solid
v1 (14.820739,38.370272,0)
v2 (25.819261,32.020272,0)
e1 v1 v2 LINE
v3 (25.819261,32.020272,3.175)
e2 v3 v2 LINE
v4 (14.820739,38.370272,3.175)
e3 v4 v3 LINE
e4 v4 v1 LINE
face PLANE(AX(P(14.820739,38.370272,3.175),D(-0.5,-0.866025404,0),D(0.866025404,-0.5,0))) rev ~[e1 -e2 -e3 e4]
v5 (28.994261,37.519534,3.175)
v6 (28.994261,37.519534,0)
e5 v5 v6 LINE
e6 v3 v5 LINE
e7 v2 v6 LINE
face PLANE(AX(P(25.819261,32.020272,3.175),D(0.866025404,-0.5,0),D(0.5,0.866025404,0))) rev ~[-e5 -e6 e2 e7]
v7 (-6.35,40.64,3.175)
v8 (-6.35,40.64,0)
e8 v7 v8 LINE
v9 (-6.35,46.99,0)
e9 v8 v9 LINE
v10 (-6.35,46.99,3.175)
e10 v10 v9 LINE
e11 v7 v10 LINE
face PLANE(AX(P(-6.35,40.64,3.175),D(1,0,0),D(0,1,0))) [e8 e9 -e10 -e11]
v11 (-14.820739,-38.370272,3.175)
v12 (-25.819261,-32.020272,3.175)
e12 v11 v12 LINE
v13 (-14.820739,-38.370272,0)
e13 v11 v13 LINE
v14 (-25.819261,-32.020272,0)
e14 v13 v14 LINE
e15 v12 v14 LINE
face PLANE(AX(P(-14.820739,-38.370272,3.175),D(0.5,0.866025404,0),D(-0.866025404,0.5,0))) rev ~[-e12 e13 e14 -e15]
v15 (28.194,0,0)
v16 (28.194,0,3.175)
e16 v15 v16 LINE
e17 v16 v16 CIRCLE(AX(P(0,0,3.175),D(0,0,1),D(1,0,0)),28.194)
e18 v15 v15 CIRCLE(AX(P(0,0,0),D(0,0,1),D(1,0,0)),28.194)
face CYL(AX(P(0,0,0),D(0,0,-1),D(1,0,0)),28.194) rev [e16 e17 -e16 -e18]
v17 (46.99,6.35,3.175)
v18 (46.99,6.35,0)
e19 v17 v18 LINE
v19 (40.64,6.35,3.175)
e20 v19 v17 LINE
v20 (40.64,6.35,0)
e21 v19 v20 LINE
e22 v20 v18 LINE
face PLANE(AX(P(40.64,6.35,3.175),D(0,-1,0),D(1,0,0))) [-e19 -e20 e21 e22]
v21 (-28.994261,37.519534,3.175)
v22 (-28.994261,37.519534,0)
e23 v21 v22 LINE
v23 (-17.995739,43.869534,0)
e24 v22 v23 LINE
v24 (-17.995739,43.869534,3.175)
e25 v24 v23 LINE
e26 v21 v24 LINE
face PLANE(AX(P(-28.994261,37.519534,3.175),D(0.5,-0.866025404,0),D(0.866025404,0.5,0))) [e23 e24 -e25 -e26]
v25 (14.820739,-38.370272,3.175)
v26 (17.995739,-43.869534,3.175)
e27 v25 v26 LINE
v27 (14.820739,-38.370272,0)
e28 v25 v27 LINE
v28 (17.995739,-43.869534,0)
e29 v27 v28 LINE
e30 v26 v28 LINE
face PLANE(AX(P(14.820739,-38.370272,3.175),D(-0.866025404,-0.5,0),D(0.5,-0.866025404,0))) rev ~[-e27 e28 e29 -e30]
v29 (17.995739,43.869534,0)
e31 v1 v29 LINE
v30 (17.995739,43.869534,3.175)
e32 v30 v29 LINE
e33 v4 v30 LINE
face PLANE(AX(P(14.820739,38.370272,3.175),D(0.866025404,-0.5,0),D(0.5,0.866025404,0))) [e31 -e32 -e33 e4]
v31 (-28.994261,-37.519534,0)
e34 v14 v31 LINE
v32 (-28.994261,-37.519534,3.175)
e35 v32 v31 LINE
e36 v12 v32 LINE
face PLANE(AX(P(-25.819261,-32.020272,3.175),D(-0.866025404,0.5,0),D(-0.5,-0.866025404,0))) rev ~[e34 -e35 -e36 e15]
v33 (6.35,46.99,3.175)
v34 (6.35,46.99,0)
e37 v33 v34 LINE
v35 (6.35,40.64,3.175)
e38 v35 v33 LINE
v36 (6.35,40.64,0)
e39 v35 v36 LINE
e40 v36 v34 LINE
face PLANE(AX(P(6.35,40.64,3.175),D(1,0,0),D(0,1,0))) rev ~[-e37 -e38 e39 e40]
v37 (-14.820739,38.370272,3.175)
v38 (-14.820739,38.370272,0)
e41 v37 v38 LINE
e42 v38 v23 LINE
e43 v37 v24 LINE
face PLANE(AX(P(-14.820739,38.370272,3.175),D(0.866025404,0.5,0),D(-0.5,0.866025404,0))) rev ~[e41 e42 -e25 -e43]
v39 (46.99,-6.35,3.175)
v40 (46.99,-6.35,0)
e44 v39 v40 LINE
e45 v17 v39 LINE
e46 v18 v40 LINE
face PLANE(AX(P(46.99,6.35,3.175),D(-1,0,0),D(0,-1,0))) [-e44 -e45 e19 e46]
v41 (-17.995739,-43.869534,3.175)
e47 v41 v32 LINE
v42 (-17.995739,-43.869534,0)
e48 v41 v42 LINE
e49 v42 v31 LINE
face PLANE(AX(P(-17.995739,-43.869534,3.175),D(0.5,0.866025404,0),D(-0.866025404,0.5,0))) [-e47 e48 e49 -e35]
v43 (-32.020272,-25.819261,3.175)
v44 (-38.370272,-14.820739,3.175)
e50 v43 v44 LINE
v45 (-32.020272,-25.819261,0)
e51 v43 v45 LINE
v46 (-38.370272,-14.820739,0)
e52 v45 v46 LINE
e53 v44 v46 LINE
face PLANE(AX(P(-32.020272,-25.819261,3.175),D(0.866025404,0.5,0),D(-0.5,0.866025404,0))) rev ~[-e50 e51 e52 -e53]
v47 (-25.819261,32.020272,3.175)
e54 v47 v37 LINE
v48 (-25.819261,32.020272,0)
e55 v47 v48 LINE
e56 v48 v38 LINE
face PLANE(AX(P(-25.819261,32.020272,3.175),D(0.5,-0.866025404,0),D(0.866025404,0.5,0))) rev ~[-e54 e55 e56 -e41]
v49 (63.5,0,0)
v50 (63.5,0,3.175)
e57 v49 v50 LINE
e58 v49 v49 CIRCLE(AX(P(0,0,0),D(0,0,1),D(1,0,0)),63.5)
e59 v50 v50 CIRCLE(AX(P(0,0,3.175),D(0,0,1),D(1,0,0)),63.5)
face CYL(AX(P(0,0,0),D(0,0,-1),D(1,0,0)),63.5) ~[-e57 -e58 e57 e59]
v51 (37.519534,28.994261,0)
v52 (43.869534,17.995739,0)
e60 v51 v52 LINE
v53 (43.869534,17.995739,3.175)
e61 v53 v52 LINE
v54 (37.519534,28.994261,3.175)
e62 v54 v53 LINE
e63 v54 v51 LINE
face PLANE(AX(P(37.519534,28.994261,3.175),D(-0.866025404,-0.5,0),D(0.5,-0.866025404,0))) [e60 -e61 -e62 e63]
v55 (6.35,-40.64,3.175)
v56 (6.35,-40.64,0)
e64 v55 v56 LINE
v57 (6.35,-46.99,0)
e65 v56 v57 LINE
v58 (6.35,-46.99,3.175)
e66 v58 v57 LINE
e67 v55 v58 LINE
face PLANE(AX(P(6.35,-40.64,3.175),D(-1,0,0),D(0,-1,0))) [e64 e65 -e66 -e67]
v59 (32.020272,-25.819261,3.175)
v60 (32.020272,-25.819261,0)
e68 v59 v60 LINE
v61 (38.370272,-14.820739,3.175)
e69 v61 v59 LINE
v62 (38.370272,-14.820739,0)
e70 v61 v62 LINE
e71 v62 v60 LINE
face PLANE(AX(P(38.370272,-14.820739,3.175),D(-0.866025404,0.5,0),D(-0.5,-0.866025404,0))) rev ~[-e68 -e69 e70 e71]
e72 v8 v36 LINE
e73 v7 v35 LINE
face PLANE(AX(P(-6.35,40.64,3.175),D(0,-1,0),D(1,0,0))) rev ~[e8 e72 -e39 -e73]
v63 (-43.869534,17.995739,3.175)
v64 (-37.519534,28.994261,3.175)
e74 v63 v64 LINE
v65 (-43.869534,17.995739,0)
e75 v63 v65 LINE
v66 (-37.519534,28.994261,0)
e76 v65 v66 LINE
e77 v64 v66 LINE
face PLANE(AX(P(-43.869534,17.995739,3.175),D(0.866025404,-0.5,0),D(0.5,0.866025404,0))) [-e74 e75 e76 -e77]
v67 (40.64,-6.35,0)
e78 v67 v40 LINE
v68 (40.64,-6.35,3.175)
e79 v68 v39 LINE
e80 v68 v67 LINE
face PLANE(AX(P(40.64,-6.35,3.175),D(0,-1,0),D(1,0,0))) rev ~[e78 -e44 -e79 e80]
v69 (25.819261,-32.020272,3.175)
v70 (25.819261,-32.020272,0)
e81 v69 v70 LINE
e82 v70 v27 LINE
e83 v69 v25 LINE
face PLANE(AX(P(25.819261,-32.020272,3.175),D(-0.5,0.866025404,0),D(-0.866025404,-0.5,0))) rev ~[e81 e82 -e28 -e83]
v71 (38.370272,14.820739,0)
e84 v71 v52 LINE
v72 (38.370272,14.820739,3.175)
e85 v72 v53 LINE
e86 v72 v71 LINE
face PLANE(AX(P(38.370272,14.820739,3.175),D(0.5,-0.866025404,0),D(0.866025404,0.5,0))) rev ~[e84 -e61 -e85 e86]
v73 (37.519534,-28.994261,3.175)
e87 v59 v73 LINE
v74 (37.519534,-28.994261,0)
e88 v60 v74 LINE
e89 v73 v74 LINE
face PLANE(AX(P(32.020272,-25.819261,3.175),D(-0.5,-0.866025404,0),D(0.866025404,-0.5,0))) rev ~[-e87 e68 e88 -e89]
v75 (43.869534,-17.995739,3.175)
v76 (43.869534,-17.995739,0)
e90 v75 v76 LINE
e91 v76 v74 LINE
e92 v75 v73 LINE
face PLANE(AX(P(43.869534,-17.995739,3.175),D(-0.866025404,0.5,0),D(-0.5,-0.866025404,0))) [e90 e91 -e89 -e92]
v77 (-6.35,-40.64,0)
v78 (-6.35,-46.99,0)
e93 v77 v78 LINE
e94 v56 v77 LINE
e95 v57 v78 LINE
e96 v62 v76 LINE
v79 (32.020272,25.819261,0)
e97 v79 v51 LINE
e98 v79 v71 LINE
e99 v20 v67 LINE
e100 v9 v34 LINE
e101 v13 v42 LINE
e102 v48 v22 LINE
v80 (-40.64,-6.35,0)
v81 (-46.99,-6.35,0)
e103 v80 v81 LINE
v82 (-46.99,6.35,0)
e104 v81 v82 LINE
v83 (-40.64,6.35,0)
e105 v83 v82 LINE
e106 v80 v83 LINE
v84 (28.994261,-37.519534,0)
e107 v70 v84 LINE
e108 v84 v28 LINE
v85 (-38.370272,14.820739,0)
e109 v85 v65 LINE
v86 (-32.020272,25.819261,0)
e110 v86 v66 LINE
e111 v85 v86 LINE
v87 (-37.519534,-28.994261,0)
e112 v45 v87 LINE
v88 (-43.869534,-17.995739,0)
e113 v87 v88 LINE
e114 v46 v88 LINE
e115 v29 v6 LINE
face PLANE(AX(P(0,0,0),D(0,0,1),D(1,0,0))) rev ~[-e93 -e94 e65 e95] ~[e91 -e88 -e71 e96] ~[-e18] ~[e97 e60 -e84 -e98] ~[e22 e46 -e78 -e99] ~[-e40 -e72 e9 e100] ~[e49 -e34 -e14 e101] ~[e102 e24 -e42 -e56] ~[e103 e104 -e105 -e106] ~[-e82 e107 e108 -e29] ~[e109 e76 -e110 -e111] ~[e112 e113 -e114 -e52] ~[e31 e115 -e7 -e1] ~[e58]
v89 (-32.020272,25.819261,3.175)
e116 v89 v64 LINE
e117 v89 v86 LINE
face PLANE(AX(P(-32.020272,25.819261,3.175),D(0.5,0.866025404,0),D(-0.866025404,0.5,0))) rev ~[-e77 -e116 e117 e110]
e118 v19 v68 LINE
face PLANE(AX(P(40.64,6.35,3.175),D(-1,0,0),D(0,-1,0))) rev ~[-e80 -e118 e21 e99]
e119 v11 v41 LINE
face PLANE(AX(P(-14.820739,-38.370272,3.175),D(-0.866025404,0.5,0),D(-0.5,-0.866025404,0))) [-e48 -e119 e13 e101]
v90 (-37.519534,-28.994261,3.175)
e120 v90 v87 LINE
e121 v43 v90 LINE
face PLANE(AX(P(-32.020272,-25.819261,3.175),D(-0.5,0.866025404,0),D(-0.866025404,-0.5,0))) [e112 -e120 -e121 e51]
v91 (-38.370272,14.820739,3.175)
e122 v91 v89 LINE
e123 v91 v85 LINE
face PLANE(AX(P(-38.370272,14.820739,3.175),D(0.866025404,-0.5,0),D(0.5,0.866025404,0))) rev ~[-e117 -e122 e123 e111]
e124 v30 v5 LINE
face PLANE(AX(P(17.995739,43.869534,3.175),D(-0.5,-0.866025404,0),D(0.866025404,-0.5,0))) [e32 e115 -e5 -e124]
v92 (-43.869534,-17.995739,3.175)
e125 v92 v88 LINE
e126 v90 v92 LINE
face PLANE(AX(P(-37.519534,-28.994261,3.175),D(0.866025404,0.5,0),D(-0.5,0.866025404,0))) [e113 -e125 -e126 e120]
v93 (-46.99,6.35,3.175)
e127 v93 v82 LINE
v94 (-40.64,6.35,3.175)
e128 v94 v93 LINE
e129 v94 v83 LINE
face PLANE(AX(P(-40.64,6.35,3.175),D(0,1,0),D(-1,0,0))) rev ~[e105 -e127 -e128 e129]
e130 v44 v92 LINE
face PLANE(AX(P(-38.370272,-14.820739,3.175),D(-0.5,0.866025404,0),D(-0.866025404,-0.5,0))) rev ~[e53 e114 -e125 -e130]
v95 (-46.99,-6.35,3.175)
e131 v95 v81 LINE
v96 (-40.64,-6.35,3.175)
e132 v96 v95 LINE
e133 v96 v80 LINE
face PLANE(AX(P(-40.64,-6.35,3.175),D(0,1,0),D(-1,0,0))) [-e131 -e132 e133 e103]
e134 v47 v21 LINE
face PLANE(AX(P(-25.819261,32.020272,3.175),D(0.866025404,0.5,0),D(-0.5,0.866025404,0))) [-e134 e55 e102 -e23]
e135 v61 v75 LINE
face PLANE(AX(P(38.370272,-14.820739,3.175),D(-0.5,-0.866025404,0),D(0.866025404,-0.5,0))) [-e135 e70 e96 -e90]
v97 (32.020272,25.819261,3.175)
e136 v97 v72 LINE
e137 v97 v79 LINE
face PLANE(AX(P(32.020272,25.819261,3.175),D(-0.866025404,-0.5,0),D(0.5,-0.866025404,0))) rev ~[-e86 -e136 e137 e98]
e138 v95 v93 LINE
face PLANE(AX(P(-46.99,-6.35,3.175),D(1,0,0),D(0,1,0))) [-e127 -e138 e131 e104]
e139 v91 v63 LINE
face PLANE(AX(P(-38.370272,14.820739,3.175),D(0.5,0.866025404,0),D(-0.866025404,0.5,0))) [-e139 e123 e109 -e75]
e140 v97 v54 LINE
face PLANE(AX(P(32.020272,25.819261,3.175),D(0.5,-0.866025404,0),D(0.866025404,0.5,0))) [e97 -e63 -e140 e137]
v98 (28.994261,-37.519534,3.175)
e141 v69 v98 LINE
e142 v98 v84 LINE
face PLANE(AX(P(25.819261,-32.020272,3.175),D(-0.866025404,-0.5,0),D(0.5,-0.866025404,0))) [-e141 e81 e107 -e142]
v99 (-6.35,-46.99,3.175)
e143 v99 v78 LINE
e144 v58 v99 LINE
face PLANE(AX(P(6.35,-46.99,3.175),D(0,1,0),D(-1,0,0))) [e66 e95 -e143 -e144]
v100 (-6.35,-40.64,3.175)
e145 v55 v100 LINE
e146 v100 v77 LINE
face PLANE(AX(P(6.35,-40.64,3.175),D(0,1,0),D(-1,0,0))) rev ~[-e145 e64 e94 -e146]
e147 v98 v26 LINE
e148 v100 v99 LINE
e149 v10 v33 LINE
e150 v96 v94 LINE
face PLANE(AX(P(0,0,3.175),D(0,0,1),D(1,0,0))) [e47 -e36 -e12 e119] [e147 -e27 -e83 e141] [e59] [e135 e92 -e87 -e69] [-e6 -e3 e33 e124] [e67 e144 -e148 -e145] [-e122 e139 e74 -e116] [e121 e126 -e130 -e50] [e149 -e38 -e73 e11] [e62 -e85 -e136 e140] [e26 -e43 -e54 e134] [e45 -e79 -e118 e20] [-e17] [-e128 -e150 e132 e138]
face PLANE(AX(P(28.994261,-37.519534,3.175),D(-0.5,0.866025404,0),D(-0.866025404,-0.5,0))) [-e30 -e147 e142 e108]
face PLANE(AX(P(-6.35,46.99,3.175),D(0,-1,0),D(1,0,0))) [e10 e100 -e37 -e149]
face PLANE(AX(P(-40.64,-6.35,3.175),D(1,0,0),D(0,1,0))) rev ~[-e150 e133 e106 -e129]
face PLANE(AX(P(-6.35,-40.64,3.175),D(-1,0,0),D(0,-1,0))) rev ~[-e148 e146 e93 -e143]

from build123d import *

# Parameters (mm, degrees)
F0_R            = 63.5
F0_R_2          = 28.194
F1_DEPTH        = 3.175
F2_W            = 12.7
F2_H            = 6.35
F3_DEPTH        = 3.176
F3_COPIES_COUNT = 12


# Not quite as in the source:
# - a pattern or mirror of a feature is missing from the dataset's text; its kind, count and spacing are read off the source's solid


with BuildPart() as f1:
    # F0 (on Top) → F1 (new body)
    with BuildSketch(Plane.XY):
        Circle(F0_R)
        Circle(F0_R_2, mode=Mode.SUBTRACT)
    extrude(amount=F1_DEPTH)

    # F2 (on face) → F3 (cut, through all)
    with BuildSketch(Plane.XY.offset(3.175)):
        with Locations((0, 43.815)):
            Rectangle(F2_W, F2_H)
    f3 = extrude(amount=-F3_DEPTH, mode=Mode.SUBTRACT)

    # F3_copies: F3 ×12 about axis
    f3_copies_axis = Axis((0, 0, 0), (0, 0, 1))
    for i in range(1, F3_COPIES_COUNT):
        add(f3.rotate(f3_copies_axis, i * 360 / F3_COPIES_COUNT), mode=Mode.SUBTRACT)


solid = f1.part
